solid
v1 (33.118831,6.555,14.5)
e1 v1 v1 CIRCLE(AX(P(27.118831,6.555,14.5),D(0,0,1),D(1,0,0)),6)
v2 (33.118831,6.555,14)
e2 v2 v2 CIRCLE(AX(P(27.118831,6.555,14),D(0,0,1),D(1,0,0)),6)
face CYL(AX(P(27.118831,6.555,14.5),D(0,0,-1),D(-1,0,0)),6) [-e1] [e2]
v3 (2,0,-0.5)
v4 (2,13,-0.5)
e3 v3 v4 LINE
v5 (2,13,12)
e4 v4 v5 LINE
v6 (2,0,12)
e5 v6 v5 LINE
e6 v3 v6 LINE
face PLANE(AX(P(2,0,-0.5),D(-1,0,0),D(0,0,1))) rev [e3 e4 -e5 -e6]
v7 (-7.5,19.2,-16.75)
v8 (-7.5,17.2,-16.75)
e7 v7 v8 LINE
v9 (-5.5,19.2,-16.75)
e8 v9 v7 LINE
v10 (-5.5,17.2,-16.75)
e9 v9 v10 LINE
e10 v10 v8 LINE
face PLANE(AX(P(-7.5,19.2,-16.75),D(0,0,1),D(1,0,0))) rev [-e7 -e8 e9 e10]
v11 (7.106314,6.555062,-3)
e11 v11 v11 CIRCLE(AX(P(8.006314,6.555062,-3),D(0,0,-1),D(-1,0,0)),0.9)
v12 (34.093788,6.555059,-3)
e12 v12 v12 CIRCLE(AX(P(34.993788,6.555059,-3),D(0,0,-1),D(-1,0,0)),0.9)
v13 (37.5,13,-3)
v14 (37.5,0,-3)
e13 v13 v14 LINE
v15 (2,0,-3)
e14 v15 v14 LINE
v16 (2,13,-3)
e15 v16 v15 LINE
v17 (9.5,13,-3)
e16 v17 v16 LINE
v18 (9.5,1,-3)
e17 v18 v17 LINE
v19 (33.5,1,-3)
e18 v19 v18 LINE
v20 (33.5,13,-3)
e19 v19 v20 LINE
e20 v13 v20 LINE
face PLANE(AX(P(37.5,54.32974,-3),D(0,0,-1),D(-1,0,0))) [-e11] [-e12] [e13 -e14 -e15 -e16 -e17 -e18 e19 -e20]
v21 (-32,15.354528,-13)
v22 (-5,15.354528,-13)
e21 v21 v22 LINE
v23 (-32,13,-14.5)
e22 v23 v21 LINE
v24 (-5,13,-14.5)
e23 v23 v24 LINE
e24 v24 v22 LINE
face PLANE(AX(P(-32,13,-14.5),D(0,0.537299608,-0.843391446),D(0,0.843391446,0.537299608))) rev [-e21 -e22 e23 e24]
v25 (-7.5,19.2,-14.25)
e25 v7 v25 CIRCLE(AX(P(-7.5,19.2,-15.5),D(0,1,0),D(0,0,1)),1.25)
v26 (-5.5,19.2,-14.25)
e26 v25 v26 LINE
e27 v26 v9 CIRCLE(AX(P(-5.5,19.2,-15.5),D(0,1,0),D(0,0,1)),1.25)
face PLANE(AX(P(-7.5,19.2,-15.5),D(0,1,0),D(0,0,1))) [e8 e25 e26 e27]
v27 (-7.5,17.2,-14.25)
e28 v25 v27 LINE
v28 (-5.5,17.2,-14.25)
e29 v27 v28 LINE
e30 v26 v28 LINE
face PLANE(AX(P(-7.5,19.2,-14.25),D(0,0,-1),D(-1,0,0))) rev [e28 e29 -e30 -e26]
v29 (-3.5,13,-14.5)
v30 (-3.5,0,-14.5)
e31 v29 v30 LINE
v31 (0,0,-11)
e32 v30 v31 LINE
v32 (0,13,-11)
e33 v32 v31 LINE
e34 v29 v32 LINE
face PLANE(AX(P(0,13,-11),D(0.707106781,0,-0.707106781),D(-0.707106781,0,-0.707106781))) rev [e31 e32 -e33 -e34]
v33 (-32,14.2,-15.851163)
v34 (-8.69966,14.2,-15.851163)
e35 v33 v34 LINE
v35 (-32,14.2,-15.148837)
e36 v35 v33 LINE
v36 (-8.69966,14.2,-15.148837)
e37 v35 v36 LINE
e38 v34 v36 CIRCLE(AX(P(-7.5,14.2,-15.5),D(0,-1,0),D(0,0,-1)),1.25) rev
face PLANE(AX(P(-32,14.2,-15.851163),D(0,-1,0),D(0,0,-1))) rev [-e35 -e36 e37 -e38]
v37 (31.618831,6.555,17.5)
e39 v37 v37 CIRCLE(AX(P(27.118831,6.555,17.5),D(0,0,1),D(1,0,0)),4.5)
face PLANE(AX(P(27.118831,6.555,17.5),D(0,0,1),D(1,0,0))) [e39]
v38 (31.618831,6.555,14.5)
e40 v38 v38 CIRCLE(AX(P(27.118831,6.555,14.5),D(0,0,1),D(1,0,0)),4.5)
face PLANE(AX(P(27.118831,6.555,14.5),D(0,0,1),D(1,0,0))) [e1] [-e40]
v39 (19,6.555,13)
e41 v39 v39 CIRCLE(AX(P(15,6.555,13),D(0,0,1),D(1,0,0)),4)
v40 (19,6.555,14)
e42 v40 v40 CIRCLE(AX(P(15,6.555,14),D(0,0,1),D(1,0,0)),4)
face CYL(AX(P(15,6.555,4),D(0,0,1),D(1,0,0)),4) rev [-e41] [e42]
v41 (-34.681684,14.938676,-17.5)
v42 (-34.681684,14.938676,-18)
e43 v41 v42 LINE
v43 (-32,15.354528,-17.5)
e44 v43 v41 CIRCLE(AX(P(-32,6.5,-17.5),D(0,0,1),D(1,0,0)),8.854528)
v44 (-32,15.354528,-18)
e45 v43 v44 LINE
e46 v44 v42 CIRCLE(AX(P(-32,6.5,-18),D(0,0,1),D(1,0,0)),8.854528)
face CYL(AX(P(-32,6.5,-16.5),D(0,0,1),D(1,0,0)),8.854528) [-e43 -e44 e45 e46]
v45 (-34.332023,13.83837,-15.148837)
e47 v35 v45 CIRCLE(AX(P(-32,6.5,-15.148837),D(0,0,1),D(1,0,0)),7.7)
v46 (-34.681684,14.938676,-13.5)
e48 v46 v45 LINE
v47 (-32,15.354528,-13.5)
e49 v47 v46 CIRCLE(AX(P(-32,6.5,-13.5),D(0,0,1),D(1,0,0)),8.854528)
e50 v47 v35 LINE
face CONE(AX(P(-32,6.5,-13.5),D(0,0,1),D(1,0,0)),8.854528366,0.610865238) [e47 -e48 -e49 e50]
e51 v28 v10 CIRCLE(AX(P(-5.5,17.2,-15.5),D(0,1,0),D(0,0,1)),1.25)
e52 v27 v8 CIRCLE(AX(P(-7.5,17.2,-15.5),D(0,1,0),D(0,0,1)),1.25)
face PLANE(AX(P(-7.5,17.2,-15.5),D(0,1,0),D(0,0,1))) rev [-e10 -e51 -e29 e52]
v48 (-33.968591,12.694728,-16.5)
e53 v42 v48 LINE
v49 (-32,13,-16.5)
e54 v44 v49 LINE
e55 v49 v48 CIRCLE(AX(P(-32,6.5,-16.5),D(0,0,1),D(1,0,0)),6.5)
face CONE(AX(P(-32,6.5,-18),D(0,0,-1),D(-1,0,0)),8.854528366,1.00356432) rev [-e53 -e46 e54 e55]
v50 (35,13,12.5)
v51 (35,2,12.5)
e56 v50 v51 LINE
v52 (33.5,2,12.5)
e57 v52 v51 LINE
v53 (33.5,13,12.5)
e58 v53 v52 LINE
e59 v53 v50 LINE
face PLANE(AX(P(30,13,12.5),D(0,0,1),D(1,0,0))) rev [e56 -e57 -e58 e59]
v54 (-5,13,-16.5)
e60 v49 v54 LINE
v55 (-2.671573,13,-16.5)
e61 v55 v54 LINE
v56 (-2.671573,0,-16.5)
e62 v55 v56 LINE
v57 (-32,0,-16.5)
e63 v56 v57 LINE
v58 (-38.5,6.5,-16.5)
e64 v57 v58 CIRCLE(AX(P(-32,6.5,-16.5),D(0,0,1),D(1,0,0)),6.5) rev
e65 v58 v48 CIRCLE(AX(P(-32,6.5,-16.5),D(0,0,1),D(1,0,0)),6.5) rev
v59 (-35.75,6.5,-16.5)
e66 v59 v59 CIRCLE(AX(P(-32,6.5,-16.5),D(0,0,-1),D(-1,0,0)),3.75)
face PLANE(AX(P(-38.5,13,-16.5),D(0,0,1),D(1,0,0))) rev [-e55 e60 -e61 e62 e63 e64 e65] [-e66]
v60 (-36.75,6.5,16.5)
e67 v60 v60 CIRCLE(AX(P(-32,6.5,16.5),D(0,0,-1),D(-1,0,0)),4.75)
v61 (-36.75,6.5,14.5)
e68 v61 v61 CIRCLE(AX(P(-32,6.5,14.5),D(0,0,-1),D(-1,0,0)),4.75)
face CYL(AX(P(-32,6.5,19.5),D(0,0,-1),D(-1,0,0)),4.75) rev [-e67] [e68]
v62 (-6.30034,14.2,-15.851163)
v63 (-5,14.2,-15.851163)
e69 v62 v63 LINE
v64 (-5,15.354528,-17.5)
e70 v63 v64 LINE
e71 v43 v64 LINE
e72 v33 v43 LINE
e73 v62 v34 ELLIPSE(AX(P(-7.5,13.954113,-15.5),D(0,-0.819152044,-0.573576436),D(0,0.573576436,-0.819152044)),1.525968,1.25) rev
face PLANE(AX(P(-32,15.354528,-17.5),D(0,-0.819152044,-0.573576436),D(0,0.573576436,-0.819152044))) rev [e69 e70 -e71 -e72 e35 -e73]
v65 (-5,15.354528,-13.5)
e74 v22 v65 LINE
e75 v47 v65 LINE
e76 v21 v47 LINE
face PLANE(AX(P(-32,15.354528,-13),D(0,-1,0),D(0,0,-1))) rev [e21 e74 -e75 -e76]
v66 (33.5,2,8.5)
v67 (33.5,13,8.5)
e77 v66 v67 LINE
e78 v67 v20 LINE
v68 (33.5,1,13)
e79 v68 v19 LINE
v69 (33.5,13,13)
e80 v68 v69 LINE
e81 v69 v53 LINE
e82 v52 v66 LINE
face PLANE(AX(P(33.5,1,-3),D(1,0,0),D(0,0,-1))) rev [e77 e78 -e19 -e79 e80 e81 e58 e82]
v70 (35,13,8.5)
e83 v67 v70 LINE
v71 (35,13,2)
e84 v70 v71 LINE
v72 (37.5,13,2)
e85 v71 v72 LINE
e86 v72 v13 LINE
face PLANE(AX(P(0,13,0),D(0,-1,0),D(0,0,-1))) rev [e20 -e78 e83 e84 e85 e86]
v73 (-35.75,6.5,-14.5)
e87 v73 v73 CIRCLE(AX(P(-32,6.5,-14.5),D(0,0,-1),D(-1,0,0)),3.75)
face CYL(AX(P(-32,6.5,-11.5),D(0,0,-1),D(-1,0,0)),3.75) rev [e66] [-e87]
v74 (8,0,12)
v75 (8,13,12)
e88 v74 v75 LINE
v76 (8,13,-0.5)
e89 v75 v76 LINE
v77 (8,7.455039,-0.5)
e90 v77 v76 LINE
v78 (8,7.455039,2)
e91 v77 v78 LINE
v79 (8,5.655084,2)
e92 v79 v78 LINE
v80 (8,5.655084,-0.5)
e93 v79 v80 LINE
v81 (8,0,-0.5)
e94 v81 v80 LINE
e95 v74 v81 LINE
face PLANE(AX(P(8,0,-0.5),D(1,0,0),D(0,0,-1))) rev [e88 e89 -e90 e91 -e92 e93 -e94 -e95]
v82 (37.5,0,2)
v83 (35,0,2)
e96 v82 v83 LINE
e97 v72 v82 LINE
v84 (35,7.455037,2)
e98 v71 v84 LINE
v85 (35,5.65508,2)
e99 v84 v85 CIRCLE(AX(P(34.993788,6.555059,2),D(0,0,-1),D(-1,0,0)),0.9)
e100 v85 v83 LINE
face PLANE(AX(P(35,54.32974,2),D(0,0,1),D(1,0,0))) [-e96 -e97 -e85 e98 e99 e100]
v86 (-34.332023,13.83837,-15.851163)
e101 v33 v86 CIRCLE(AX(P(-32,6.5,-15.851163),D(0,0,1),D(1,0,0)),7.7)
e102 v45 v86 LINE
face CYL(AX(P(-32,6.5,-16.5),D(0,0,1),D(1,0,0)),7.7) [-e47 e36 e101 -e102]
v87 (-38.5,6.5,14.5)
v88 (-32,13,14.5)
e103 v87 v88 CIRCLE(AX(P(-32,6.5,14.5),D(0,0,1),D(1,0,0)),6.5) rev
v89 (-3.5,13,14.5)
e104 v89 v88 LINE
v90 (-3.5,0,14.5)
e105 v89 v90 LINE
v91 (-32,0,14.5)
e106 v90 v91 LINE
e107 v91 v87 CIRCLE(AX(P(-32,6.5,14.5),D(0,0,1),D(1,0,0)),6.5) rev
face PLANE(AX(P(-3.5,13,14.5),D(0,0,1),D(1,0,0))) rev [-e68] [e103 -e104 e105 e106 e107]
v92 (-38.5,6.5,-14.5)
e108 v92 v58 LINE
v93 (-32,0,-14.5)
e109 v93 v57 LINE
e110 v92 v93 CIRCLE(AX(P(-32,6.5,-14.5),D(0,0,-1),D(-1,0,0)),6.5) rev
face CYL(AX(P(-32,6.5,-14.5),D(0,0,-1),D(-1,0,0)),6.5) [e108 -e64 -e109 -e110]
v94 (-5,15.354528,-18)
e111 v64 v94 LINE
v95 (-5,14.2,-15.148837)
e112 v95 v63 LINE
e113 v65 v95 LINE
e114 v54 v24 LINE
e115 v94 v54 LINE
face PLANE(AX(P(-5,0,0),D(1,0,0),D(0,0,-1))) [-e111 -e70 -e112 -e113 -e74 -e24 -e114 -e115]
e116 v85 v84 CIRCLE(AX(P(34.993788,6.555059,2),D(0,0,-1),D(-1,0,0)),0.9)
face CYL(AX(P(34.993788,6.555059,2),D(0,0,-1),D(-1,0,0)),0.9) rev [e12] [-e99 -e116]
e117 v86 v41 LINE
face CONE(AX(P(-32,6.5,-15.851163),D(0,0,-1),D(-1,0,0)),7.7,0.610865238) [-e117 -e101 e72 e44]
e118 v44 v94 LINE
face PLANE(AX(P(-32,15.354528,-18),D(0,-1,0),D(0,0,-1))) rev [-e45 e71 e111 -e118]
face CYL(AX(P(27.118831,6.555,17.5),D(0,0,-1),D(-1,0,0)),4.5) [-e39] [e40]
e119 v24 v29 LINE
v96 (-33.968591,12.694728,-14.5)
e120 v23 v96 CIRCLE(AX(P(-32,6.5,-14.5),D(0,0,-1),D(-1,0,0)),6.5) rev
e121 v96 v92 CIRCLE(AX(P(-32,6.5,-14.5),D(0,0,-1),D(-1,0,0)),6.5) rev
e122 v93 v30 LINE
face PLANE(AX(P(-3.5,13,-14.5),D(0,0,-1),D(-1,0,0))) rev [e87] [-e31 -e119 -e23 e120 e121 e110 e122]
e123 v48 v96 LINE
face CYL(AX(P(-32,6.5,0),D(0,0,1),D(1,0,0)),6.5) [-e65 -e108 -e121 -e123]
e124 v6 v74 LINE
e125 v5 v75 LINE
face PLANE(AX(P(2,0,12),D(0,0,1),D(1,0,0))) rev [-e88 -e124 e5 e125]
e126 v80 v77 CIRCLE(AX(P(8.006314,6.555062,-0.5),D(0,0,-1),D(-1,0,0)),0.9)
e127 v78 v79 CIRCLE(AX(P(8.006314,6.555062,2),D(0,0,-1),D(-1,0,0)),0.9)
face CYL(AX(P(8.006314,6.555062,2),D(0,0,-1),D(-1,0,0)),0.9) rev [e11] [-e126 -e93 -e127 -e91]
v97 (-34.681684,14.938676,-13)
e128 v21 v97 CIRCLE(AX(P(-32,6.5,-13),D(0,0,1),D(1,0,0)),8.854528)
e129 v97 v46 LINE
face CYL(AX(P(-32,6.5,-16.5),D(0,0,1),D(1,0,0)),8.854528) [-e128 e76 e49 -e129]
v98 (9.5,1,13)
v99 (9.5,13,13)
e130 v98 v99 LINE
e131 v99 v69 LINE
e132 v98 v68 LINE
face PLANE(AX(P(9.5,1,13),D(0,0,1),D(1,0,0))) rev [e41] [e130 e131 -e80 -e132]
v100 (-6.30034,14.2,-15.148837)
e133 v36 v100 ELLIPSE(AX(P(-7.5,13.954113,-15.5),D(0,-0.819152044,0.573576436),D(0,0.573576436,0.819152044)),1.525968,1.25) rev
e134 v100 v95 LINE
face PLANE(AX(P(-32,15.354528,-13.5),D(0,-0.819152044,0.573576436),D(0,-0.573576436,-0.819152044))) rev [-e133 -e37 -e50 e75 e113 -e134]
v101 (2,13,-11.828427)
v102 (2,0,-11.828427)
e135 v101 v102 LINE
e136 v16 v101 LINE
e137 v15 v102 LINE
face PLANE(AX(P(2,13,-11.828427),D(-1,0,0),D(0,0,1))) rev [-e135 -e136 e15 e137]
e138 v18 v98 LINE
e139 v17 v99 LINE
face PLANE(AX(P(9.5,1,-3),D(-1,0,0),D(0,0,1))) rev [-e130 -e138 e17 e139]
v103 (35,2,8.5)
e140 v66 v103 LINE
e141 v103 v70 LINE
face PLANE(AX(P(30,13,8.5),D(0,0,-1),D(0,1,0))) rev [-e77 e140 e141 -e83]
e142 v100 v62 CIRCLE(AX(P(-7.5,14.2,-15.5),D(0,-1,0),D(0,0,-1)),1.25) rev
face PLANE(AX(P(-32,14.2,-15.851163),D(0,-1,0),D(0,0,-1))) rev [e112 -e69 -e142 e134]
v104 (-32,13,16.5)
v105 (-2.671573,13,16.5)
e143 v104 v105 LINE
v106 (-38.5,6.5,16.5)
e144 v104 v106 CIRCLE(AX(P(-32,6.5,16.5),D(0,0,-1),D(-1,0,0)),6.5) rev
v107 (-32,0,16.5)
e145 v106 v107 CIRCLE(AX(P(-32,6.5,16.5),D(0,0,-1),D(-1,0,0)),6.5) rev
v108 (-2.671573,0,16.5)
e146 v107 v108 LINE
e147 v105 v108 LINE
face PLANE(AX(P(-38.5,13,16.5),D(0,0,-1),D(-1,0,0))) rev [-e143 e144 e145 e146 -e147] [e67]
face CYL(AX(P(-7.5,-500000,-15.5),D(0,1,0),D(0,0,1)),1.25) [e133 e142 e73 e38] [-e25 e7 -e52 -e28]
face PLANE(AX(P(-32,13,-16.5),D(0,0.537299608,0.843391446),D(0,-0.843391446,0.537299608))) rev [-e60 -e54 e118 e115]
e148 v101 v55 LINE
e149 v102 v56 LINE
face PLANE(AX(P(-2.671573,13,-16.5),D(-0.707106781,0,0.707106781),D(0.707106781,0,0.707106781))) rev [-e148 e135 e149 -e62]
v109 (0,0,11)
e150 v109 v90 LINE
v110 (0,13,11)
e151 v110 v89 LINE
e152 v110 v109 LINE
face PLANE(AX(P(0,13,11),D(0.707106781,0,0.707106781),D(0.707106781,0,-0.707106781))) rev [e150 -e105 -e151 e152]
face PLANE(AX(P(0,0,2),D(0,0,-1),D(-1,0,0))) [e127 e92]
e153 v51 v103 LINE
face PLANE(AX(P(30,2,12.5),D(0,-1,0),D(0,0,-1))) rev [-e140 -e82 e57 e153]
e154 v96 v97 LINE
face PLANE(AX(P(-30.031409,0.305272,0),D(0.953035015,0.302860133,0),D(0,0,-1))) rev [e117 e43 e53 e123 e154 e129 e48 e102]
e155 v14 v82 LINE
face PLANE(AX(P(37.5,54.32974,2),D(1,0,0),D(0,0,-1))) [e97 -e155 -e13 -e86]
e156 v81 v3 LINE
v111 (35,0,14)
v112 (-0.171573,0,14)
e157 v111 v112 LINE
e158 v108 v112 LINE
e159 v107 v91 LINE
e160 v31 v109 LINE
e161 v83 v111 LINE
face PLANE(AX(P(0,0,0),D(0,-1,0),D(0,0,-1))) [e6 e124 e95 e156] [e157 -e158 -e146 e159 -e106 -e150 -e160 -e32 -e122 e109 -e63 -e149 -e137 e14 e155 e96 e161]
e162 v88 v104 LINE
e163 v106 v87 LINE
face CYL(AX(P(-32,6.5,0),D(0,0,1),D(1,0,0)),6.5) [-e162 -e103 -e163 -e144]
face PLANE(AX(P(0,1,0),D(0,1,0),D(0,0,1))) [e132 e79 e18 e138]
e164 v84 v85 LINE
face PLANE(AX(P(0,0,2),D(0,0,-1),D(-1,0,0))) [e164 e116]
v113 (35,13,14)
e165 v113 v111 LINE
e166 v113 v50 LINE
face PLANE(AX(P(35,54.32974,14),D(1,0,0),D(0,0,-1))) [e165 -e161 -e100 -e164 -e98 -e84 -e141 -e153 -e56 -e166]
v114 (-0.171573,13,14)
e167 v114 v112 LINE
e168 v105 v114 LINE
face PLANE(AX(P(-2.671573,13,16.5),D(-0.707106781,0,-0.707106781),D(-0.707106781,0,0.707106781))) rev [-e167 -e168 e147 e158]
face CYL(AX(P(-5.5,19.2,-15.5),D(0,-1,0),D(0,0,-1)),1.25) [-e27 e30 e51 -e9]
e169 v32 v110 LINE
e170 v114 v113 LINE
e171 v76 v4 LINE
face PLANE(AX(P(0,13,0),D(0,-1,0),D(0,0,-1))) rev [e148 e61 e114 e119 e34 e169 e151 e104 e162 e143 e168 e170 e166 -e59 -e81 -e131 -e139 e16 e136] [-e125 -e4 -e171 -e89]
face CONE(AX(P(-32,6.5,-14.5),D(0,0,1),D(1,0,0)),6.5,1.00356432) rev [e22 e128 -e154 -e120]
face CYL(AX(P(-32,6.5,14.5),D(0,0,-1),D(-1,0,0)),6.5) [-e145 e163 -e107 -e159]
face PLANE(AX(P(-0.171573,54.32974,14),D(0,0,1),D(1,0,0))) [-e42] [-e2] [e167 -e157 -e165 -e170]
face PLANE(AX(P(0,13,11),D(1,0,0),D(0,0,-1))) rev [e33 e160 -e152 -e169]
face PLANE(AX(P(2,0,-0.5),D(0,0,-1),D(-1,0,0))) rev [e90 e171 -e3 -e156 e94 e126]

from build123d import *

# Parameters (mm, degrees)
P_IDAT_VYSUNUT_M1_DEPTH  = 13
P_IDAT_VYSUNUT_M2_DEPTH  = 13
SKICA3_W                 = 6
SKICA3_H                 = 12.5
ODEBRAT_VYSUNUT_M1_DEPTH = 44.857724519
SKICA4_W                 = 24
SKICA4_H                 = 16
ODEBRAT_VYSUNUT_M2_DEPTH = 12
SKICA5_R                 = 0.9
ODEBRAT_VYSUNUT_M3_DEPTH = 5
ZAOBLIT1_R               = 6.5
SKICA6_R                 = 3.75
ODEBRAT_VYSUNUT_M4_DEPTH = 5
SKICA7_R                 = 4.75
ODEBRAT_VYSUNUT_M5_DEPTH = 5
SKICA8_W                 = 4
SKICA8_H                 = 11
ODEBRAT_VYSUNUT_M6_DEPTH = 5
SKICA9_R                 = 4
ODEBRAT_VYSUNUT_M7_DEPTH = 10
SKICA10_R                = 6
P_IDAT_VYSUNUT_M3_DEPTH  = 0.5
SKICA11_R                = 4.5
P_IDAT_VYSUNUT_M4_DEPTH  = 3
P_IDAT_VYSUNUT_M5_REACH  = 49.809
P_IDAT_START             = 3
SKICA15_R                = 1.25
P_IDAT_START_2           = 2
P_IDAT_VYSUNUT_M6_DEPTH  = 2


with BuildPart() as part:
    # Skica1 → Přidat vysunutím1 (new body)
    with BuildSketch(Plane(origin=(0, 0, 0), x_dir=(1, 0, 0), z_dir=(0, 1, 0))):
        Polygon((0, -11), (0, 11), (-3.5, 14.5), (-38.5, 14.5), (-38.5, 16.5), (-2.671572875, 16.5), (2, 11.828427125), (2, -11.828427125), (-2.671572875, -16.5), (-38.5, -16.5), (-38.5, -14.5), (-3.5, -14.5), align=None)
    extrude(amount=P_IDAT_VYSUNUT_M1_DEPTH)

    # Skica2 → Přidat vysunutím2 (add)
    with BuildSketch(Plane.XZ):
        Polygon((-0.171572875, 14), (35, 14), (35, 2), (37.5, 2), (37.5, -3), (2, -3), (2, 11.828427125), align=None)
    extrude(amount=-P_IDAT_VYSUNUT_M2_DEPTH)

    # Skica3 → Odebrat vysunutím1 (cut, through all)
    with BuildSketch(Plane(origin=(0, 13, 0), x_dir=(1, 0, 0), z_dir=(0, 1, 0))):
        with Locations((5, -5.75)):
            Rectangle(SKICA3_W, SKICA3_H)
    extrude(amount=-ODEBRAT_VYSUNUT_M1_DEPTH, mode=Mode.SUBTRACT)

    # Skica4 → Odebrat vysunutím2 (cut)
    with BuildSketch(Plane(origin=(0, 13, 0), x_dir=(1, 0, 0), z_dir=(0, 1, 0))):
        with Locations((21.5, -5)):
            Rectangle(SKICA4_W, SKICA4_H)
    extrude(amount=-ODEBRAT_VYSUNUT_M2_DEPTH, mode=Mode.SUBTRACT)

    # Skica5 → Odebrat vysunutím3 (cut)
    with BuildSketch(Plane(origin=(0, 0, -3), x_dir=(-1, 0, 0), z_dir=(0, 0, -1))):
        with Locations((-34.993787626, 6.555058734)):
            Circle(SKICA5_R)
        with Locations((-8.006314188, 6.5550616)):
            Circle(SKICA5_R)
    extrude(amount=-ODEBRAT_VYSUNUT_M3_DEPTH, mode=Mode.SUBTRACT)

    # Zaoblit1
    zaoblit1_edges = [part.edges().sort_by_distance(p)[0] for p in [
        (-38.5, 0, -15.5),
        (-38.5, 13, -15.5),
        (-38.5, 0, 15.5),
        (-38.5, 13, 15.5),
    ]]
    fillet(zaoblit1_edges, radius=ZAOBLIT1_R - 0.0001)  # a hair under: the kernel refuses the full size

    # Skica6 → Odebrat vysunutím4 (cut)
    with BuildSketch(Plane(origin=(0, 0, -16.5), x_dir=(-1, 0, 0), z_dir=(0, 0, -1))):
        with Locations((32, 6.5)):
            Circle(SKICA6_R)
    extrude(amount=-ODEBRAT_VYSUNUT_M4_DEPTH, mode=Mode.SUBTRACT)

    # Skica7 → Odebrat vysunutím5 (cut)
    with BuildSketch(Plane(origin=(0, 0, 14.5), x_dir=(-1, 0, 0), z_dir=(0, 0, -1))):
        with Locations((32, 6.5)):
            Circle(SKICA7_R)
    extrude(amount=-ODEBRAT_VYSUNUT_M5_DEPTH, mode=Mode.SUBTRACT)

    # Skica8 → Odebrat vysunutím6 (cut)
    with BuildSketch(Plane(origin=(35, 0, 0), x_dir=(0, 0, -1), z_dir=(1, 0, 0))):
        with Locations((-10.5, 7.5)):
            Rectangle(SKICA8_W, SKICA8_H)
    extrude(amount=-ODEBRAT_VYSUNUT_M6_DEPTH, mode=Mode.SUBTRACT)

    # Skica9 → Odebrat vysunutím7 (cut)
    with BuildSketch(Plane.XY.offset(14)):
        with Locations((15, 6.554999832)):
            Circle(SKICA9_R)
    extrude(amount=-ODEBRAT_VYSUNUT_M7_DEPTH, mode=Mode.SUBTRACT)

    # Skica10 → Přidat vysunutím3 (add)
    with BuildSketch(Plane.XY.offset(14)):
        with Locations((27.118831388, 6.554999832)):
            Circle(SKICA10_R)
    extrude(amount=P_IDAT_VYSUNUT_M3_DEPTH)

    # Skica11 → Přidat vysunutím4 (add)
    with BuildSketch(Plane.XY.offset(14.5)):
        with Locations((27.118831388, 6.554999832)):
            Circle(SKICA11_R)
    extrude(amount=P_IDAT_VYSUNUT_M4_DEPTH)

    # Táhnout po křivce1: sweep along a path in Skica14
    with BuildLine(Plane(origin=(0, 0, -16.5), x_dir=(-1, 0, 0), z_dir=(0, 0, -1))) as t_hnout_po_k_ivce1_path:
        Line((5, 13), (32, 13))
        ThreePointArc((32, 13), (32.996059893, 12.923228525), (33.968590866, 12.694727597))
    # Skica12 → Táhnout po křivce1 (sweep)
    with BuildSketch(Plane.ZY.offset(5)):
        Polygon((-14.5, 13), (-16.5, 13), (-18, 15.354528366), (-17.5, 15.354528366), (-15.851162616, 14.2), (-15.148837384, 14.2), (-13.5, 15.354528366), (-13, 15.354528366), align=None)
    sweep(path=t_hnout_po_k_ivce1_path.line)

    # Skica15 → Přidat vysunutím5 (add, up to next)
    with BuildSketch(Plane(origin=(0, 14.2, 0), x_dir=(1, 0, 0), z_dir=(0, 1, 0)).offset(P_IDAT_START), mode=Mode.PRIVATE) as p_idat_vysunut_m5_sk1:
        with Locations(Location((-7.5, 15.5, 0), (0, 0, 270))):
            Circle(SKICA15_R)
    p_idat_vysunut_m5_tool1 = extrude(p_idat_vysunut_m5_sk1.sketch, amount=-P_IDAT_VYSUNUT_M5_REACH, mode=Mode.PRIVATE) - part.part
    add(p_idat_vysunut_m5_tool1.solids().sort_by_distance((-7.5, 17.2, -15.5))[0])

    # Skica16 → Přidat vysunutím6 (add)
    with BuildSketch(Plane(origin=(0, 17.2, 0), x_dir=(1, 0, 0), z_dir=(0, 1, 0)).offset(P_IDAT_START_2)):
        with BuildLine():
            Line((-7.5, 16.75), (-5.5, 16.75))
            ThreePointArc((-5.5, 16.75), (-4.25, 15.5), (-5.5, 14.25))
            Line((-5.5, 14.25), (-7.5, 14.25))
            ThreePointArc((-7.5, 14.25), (-8.75, 15.5), (-7.5, 16.75))
        make_face()
    extrude(amount=-P_IDAT_VYSUNUT_M6_DEPTH)


solid = part.part
